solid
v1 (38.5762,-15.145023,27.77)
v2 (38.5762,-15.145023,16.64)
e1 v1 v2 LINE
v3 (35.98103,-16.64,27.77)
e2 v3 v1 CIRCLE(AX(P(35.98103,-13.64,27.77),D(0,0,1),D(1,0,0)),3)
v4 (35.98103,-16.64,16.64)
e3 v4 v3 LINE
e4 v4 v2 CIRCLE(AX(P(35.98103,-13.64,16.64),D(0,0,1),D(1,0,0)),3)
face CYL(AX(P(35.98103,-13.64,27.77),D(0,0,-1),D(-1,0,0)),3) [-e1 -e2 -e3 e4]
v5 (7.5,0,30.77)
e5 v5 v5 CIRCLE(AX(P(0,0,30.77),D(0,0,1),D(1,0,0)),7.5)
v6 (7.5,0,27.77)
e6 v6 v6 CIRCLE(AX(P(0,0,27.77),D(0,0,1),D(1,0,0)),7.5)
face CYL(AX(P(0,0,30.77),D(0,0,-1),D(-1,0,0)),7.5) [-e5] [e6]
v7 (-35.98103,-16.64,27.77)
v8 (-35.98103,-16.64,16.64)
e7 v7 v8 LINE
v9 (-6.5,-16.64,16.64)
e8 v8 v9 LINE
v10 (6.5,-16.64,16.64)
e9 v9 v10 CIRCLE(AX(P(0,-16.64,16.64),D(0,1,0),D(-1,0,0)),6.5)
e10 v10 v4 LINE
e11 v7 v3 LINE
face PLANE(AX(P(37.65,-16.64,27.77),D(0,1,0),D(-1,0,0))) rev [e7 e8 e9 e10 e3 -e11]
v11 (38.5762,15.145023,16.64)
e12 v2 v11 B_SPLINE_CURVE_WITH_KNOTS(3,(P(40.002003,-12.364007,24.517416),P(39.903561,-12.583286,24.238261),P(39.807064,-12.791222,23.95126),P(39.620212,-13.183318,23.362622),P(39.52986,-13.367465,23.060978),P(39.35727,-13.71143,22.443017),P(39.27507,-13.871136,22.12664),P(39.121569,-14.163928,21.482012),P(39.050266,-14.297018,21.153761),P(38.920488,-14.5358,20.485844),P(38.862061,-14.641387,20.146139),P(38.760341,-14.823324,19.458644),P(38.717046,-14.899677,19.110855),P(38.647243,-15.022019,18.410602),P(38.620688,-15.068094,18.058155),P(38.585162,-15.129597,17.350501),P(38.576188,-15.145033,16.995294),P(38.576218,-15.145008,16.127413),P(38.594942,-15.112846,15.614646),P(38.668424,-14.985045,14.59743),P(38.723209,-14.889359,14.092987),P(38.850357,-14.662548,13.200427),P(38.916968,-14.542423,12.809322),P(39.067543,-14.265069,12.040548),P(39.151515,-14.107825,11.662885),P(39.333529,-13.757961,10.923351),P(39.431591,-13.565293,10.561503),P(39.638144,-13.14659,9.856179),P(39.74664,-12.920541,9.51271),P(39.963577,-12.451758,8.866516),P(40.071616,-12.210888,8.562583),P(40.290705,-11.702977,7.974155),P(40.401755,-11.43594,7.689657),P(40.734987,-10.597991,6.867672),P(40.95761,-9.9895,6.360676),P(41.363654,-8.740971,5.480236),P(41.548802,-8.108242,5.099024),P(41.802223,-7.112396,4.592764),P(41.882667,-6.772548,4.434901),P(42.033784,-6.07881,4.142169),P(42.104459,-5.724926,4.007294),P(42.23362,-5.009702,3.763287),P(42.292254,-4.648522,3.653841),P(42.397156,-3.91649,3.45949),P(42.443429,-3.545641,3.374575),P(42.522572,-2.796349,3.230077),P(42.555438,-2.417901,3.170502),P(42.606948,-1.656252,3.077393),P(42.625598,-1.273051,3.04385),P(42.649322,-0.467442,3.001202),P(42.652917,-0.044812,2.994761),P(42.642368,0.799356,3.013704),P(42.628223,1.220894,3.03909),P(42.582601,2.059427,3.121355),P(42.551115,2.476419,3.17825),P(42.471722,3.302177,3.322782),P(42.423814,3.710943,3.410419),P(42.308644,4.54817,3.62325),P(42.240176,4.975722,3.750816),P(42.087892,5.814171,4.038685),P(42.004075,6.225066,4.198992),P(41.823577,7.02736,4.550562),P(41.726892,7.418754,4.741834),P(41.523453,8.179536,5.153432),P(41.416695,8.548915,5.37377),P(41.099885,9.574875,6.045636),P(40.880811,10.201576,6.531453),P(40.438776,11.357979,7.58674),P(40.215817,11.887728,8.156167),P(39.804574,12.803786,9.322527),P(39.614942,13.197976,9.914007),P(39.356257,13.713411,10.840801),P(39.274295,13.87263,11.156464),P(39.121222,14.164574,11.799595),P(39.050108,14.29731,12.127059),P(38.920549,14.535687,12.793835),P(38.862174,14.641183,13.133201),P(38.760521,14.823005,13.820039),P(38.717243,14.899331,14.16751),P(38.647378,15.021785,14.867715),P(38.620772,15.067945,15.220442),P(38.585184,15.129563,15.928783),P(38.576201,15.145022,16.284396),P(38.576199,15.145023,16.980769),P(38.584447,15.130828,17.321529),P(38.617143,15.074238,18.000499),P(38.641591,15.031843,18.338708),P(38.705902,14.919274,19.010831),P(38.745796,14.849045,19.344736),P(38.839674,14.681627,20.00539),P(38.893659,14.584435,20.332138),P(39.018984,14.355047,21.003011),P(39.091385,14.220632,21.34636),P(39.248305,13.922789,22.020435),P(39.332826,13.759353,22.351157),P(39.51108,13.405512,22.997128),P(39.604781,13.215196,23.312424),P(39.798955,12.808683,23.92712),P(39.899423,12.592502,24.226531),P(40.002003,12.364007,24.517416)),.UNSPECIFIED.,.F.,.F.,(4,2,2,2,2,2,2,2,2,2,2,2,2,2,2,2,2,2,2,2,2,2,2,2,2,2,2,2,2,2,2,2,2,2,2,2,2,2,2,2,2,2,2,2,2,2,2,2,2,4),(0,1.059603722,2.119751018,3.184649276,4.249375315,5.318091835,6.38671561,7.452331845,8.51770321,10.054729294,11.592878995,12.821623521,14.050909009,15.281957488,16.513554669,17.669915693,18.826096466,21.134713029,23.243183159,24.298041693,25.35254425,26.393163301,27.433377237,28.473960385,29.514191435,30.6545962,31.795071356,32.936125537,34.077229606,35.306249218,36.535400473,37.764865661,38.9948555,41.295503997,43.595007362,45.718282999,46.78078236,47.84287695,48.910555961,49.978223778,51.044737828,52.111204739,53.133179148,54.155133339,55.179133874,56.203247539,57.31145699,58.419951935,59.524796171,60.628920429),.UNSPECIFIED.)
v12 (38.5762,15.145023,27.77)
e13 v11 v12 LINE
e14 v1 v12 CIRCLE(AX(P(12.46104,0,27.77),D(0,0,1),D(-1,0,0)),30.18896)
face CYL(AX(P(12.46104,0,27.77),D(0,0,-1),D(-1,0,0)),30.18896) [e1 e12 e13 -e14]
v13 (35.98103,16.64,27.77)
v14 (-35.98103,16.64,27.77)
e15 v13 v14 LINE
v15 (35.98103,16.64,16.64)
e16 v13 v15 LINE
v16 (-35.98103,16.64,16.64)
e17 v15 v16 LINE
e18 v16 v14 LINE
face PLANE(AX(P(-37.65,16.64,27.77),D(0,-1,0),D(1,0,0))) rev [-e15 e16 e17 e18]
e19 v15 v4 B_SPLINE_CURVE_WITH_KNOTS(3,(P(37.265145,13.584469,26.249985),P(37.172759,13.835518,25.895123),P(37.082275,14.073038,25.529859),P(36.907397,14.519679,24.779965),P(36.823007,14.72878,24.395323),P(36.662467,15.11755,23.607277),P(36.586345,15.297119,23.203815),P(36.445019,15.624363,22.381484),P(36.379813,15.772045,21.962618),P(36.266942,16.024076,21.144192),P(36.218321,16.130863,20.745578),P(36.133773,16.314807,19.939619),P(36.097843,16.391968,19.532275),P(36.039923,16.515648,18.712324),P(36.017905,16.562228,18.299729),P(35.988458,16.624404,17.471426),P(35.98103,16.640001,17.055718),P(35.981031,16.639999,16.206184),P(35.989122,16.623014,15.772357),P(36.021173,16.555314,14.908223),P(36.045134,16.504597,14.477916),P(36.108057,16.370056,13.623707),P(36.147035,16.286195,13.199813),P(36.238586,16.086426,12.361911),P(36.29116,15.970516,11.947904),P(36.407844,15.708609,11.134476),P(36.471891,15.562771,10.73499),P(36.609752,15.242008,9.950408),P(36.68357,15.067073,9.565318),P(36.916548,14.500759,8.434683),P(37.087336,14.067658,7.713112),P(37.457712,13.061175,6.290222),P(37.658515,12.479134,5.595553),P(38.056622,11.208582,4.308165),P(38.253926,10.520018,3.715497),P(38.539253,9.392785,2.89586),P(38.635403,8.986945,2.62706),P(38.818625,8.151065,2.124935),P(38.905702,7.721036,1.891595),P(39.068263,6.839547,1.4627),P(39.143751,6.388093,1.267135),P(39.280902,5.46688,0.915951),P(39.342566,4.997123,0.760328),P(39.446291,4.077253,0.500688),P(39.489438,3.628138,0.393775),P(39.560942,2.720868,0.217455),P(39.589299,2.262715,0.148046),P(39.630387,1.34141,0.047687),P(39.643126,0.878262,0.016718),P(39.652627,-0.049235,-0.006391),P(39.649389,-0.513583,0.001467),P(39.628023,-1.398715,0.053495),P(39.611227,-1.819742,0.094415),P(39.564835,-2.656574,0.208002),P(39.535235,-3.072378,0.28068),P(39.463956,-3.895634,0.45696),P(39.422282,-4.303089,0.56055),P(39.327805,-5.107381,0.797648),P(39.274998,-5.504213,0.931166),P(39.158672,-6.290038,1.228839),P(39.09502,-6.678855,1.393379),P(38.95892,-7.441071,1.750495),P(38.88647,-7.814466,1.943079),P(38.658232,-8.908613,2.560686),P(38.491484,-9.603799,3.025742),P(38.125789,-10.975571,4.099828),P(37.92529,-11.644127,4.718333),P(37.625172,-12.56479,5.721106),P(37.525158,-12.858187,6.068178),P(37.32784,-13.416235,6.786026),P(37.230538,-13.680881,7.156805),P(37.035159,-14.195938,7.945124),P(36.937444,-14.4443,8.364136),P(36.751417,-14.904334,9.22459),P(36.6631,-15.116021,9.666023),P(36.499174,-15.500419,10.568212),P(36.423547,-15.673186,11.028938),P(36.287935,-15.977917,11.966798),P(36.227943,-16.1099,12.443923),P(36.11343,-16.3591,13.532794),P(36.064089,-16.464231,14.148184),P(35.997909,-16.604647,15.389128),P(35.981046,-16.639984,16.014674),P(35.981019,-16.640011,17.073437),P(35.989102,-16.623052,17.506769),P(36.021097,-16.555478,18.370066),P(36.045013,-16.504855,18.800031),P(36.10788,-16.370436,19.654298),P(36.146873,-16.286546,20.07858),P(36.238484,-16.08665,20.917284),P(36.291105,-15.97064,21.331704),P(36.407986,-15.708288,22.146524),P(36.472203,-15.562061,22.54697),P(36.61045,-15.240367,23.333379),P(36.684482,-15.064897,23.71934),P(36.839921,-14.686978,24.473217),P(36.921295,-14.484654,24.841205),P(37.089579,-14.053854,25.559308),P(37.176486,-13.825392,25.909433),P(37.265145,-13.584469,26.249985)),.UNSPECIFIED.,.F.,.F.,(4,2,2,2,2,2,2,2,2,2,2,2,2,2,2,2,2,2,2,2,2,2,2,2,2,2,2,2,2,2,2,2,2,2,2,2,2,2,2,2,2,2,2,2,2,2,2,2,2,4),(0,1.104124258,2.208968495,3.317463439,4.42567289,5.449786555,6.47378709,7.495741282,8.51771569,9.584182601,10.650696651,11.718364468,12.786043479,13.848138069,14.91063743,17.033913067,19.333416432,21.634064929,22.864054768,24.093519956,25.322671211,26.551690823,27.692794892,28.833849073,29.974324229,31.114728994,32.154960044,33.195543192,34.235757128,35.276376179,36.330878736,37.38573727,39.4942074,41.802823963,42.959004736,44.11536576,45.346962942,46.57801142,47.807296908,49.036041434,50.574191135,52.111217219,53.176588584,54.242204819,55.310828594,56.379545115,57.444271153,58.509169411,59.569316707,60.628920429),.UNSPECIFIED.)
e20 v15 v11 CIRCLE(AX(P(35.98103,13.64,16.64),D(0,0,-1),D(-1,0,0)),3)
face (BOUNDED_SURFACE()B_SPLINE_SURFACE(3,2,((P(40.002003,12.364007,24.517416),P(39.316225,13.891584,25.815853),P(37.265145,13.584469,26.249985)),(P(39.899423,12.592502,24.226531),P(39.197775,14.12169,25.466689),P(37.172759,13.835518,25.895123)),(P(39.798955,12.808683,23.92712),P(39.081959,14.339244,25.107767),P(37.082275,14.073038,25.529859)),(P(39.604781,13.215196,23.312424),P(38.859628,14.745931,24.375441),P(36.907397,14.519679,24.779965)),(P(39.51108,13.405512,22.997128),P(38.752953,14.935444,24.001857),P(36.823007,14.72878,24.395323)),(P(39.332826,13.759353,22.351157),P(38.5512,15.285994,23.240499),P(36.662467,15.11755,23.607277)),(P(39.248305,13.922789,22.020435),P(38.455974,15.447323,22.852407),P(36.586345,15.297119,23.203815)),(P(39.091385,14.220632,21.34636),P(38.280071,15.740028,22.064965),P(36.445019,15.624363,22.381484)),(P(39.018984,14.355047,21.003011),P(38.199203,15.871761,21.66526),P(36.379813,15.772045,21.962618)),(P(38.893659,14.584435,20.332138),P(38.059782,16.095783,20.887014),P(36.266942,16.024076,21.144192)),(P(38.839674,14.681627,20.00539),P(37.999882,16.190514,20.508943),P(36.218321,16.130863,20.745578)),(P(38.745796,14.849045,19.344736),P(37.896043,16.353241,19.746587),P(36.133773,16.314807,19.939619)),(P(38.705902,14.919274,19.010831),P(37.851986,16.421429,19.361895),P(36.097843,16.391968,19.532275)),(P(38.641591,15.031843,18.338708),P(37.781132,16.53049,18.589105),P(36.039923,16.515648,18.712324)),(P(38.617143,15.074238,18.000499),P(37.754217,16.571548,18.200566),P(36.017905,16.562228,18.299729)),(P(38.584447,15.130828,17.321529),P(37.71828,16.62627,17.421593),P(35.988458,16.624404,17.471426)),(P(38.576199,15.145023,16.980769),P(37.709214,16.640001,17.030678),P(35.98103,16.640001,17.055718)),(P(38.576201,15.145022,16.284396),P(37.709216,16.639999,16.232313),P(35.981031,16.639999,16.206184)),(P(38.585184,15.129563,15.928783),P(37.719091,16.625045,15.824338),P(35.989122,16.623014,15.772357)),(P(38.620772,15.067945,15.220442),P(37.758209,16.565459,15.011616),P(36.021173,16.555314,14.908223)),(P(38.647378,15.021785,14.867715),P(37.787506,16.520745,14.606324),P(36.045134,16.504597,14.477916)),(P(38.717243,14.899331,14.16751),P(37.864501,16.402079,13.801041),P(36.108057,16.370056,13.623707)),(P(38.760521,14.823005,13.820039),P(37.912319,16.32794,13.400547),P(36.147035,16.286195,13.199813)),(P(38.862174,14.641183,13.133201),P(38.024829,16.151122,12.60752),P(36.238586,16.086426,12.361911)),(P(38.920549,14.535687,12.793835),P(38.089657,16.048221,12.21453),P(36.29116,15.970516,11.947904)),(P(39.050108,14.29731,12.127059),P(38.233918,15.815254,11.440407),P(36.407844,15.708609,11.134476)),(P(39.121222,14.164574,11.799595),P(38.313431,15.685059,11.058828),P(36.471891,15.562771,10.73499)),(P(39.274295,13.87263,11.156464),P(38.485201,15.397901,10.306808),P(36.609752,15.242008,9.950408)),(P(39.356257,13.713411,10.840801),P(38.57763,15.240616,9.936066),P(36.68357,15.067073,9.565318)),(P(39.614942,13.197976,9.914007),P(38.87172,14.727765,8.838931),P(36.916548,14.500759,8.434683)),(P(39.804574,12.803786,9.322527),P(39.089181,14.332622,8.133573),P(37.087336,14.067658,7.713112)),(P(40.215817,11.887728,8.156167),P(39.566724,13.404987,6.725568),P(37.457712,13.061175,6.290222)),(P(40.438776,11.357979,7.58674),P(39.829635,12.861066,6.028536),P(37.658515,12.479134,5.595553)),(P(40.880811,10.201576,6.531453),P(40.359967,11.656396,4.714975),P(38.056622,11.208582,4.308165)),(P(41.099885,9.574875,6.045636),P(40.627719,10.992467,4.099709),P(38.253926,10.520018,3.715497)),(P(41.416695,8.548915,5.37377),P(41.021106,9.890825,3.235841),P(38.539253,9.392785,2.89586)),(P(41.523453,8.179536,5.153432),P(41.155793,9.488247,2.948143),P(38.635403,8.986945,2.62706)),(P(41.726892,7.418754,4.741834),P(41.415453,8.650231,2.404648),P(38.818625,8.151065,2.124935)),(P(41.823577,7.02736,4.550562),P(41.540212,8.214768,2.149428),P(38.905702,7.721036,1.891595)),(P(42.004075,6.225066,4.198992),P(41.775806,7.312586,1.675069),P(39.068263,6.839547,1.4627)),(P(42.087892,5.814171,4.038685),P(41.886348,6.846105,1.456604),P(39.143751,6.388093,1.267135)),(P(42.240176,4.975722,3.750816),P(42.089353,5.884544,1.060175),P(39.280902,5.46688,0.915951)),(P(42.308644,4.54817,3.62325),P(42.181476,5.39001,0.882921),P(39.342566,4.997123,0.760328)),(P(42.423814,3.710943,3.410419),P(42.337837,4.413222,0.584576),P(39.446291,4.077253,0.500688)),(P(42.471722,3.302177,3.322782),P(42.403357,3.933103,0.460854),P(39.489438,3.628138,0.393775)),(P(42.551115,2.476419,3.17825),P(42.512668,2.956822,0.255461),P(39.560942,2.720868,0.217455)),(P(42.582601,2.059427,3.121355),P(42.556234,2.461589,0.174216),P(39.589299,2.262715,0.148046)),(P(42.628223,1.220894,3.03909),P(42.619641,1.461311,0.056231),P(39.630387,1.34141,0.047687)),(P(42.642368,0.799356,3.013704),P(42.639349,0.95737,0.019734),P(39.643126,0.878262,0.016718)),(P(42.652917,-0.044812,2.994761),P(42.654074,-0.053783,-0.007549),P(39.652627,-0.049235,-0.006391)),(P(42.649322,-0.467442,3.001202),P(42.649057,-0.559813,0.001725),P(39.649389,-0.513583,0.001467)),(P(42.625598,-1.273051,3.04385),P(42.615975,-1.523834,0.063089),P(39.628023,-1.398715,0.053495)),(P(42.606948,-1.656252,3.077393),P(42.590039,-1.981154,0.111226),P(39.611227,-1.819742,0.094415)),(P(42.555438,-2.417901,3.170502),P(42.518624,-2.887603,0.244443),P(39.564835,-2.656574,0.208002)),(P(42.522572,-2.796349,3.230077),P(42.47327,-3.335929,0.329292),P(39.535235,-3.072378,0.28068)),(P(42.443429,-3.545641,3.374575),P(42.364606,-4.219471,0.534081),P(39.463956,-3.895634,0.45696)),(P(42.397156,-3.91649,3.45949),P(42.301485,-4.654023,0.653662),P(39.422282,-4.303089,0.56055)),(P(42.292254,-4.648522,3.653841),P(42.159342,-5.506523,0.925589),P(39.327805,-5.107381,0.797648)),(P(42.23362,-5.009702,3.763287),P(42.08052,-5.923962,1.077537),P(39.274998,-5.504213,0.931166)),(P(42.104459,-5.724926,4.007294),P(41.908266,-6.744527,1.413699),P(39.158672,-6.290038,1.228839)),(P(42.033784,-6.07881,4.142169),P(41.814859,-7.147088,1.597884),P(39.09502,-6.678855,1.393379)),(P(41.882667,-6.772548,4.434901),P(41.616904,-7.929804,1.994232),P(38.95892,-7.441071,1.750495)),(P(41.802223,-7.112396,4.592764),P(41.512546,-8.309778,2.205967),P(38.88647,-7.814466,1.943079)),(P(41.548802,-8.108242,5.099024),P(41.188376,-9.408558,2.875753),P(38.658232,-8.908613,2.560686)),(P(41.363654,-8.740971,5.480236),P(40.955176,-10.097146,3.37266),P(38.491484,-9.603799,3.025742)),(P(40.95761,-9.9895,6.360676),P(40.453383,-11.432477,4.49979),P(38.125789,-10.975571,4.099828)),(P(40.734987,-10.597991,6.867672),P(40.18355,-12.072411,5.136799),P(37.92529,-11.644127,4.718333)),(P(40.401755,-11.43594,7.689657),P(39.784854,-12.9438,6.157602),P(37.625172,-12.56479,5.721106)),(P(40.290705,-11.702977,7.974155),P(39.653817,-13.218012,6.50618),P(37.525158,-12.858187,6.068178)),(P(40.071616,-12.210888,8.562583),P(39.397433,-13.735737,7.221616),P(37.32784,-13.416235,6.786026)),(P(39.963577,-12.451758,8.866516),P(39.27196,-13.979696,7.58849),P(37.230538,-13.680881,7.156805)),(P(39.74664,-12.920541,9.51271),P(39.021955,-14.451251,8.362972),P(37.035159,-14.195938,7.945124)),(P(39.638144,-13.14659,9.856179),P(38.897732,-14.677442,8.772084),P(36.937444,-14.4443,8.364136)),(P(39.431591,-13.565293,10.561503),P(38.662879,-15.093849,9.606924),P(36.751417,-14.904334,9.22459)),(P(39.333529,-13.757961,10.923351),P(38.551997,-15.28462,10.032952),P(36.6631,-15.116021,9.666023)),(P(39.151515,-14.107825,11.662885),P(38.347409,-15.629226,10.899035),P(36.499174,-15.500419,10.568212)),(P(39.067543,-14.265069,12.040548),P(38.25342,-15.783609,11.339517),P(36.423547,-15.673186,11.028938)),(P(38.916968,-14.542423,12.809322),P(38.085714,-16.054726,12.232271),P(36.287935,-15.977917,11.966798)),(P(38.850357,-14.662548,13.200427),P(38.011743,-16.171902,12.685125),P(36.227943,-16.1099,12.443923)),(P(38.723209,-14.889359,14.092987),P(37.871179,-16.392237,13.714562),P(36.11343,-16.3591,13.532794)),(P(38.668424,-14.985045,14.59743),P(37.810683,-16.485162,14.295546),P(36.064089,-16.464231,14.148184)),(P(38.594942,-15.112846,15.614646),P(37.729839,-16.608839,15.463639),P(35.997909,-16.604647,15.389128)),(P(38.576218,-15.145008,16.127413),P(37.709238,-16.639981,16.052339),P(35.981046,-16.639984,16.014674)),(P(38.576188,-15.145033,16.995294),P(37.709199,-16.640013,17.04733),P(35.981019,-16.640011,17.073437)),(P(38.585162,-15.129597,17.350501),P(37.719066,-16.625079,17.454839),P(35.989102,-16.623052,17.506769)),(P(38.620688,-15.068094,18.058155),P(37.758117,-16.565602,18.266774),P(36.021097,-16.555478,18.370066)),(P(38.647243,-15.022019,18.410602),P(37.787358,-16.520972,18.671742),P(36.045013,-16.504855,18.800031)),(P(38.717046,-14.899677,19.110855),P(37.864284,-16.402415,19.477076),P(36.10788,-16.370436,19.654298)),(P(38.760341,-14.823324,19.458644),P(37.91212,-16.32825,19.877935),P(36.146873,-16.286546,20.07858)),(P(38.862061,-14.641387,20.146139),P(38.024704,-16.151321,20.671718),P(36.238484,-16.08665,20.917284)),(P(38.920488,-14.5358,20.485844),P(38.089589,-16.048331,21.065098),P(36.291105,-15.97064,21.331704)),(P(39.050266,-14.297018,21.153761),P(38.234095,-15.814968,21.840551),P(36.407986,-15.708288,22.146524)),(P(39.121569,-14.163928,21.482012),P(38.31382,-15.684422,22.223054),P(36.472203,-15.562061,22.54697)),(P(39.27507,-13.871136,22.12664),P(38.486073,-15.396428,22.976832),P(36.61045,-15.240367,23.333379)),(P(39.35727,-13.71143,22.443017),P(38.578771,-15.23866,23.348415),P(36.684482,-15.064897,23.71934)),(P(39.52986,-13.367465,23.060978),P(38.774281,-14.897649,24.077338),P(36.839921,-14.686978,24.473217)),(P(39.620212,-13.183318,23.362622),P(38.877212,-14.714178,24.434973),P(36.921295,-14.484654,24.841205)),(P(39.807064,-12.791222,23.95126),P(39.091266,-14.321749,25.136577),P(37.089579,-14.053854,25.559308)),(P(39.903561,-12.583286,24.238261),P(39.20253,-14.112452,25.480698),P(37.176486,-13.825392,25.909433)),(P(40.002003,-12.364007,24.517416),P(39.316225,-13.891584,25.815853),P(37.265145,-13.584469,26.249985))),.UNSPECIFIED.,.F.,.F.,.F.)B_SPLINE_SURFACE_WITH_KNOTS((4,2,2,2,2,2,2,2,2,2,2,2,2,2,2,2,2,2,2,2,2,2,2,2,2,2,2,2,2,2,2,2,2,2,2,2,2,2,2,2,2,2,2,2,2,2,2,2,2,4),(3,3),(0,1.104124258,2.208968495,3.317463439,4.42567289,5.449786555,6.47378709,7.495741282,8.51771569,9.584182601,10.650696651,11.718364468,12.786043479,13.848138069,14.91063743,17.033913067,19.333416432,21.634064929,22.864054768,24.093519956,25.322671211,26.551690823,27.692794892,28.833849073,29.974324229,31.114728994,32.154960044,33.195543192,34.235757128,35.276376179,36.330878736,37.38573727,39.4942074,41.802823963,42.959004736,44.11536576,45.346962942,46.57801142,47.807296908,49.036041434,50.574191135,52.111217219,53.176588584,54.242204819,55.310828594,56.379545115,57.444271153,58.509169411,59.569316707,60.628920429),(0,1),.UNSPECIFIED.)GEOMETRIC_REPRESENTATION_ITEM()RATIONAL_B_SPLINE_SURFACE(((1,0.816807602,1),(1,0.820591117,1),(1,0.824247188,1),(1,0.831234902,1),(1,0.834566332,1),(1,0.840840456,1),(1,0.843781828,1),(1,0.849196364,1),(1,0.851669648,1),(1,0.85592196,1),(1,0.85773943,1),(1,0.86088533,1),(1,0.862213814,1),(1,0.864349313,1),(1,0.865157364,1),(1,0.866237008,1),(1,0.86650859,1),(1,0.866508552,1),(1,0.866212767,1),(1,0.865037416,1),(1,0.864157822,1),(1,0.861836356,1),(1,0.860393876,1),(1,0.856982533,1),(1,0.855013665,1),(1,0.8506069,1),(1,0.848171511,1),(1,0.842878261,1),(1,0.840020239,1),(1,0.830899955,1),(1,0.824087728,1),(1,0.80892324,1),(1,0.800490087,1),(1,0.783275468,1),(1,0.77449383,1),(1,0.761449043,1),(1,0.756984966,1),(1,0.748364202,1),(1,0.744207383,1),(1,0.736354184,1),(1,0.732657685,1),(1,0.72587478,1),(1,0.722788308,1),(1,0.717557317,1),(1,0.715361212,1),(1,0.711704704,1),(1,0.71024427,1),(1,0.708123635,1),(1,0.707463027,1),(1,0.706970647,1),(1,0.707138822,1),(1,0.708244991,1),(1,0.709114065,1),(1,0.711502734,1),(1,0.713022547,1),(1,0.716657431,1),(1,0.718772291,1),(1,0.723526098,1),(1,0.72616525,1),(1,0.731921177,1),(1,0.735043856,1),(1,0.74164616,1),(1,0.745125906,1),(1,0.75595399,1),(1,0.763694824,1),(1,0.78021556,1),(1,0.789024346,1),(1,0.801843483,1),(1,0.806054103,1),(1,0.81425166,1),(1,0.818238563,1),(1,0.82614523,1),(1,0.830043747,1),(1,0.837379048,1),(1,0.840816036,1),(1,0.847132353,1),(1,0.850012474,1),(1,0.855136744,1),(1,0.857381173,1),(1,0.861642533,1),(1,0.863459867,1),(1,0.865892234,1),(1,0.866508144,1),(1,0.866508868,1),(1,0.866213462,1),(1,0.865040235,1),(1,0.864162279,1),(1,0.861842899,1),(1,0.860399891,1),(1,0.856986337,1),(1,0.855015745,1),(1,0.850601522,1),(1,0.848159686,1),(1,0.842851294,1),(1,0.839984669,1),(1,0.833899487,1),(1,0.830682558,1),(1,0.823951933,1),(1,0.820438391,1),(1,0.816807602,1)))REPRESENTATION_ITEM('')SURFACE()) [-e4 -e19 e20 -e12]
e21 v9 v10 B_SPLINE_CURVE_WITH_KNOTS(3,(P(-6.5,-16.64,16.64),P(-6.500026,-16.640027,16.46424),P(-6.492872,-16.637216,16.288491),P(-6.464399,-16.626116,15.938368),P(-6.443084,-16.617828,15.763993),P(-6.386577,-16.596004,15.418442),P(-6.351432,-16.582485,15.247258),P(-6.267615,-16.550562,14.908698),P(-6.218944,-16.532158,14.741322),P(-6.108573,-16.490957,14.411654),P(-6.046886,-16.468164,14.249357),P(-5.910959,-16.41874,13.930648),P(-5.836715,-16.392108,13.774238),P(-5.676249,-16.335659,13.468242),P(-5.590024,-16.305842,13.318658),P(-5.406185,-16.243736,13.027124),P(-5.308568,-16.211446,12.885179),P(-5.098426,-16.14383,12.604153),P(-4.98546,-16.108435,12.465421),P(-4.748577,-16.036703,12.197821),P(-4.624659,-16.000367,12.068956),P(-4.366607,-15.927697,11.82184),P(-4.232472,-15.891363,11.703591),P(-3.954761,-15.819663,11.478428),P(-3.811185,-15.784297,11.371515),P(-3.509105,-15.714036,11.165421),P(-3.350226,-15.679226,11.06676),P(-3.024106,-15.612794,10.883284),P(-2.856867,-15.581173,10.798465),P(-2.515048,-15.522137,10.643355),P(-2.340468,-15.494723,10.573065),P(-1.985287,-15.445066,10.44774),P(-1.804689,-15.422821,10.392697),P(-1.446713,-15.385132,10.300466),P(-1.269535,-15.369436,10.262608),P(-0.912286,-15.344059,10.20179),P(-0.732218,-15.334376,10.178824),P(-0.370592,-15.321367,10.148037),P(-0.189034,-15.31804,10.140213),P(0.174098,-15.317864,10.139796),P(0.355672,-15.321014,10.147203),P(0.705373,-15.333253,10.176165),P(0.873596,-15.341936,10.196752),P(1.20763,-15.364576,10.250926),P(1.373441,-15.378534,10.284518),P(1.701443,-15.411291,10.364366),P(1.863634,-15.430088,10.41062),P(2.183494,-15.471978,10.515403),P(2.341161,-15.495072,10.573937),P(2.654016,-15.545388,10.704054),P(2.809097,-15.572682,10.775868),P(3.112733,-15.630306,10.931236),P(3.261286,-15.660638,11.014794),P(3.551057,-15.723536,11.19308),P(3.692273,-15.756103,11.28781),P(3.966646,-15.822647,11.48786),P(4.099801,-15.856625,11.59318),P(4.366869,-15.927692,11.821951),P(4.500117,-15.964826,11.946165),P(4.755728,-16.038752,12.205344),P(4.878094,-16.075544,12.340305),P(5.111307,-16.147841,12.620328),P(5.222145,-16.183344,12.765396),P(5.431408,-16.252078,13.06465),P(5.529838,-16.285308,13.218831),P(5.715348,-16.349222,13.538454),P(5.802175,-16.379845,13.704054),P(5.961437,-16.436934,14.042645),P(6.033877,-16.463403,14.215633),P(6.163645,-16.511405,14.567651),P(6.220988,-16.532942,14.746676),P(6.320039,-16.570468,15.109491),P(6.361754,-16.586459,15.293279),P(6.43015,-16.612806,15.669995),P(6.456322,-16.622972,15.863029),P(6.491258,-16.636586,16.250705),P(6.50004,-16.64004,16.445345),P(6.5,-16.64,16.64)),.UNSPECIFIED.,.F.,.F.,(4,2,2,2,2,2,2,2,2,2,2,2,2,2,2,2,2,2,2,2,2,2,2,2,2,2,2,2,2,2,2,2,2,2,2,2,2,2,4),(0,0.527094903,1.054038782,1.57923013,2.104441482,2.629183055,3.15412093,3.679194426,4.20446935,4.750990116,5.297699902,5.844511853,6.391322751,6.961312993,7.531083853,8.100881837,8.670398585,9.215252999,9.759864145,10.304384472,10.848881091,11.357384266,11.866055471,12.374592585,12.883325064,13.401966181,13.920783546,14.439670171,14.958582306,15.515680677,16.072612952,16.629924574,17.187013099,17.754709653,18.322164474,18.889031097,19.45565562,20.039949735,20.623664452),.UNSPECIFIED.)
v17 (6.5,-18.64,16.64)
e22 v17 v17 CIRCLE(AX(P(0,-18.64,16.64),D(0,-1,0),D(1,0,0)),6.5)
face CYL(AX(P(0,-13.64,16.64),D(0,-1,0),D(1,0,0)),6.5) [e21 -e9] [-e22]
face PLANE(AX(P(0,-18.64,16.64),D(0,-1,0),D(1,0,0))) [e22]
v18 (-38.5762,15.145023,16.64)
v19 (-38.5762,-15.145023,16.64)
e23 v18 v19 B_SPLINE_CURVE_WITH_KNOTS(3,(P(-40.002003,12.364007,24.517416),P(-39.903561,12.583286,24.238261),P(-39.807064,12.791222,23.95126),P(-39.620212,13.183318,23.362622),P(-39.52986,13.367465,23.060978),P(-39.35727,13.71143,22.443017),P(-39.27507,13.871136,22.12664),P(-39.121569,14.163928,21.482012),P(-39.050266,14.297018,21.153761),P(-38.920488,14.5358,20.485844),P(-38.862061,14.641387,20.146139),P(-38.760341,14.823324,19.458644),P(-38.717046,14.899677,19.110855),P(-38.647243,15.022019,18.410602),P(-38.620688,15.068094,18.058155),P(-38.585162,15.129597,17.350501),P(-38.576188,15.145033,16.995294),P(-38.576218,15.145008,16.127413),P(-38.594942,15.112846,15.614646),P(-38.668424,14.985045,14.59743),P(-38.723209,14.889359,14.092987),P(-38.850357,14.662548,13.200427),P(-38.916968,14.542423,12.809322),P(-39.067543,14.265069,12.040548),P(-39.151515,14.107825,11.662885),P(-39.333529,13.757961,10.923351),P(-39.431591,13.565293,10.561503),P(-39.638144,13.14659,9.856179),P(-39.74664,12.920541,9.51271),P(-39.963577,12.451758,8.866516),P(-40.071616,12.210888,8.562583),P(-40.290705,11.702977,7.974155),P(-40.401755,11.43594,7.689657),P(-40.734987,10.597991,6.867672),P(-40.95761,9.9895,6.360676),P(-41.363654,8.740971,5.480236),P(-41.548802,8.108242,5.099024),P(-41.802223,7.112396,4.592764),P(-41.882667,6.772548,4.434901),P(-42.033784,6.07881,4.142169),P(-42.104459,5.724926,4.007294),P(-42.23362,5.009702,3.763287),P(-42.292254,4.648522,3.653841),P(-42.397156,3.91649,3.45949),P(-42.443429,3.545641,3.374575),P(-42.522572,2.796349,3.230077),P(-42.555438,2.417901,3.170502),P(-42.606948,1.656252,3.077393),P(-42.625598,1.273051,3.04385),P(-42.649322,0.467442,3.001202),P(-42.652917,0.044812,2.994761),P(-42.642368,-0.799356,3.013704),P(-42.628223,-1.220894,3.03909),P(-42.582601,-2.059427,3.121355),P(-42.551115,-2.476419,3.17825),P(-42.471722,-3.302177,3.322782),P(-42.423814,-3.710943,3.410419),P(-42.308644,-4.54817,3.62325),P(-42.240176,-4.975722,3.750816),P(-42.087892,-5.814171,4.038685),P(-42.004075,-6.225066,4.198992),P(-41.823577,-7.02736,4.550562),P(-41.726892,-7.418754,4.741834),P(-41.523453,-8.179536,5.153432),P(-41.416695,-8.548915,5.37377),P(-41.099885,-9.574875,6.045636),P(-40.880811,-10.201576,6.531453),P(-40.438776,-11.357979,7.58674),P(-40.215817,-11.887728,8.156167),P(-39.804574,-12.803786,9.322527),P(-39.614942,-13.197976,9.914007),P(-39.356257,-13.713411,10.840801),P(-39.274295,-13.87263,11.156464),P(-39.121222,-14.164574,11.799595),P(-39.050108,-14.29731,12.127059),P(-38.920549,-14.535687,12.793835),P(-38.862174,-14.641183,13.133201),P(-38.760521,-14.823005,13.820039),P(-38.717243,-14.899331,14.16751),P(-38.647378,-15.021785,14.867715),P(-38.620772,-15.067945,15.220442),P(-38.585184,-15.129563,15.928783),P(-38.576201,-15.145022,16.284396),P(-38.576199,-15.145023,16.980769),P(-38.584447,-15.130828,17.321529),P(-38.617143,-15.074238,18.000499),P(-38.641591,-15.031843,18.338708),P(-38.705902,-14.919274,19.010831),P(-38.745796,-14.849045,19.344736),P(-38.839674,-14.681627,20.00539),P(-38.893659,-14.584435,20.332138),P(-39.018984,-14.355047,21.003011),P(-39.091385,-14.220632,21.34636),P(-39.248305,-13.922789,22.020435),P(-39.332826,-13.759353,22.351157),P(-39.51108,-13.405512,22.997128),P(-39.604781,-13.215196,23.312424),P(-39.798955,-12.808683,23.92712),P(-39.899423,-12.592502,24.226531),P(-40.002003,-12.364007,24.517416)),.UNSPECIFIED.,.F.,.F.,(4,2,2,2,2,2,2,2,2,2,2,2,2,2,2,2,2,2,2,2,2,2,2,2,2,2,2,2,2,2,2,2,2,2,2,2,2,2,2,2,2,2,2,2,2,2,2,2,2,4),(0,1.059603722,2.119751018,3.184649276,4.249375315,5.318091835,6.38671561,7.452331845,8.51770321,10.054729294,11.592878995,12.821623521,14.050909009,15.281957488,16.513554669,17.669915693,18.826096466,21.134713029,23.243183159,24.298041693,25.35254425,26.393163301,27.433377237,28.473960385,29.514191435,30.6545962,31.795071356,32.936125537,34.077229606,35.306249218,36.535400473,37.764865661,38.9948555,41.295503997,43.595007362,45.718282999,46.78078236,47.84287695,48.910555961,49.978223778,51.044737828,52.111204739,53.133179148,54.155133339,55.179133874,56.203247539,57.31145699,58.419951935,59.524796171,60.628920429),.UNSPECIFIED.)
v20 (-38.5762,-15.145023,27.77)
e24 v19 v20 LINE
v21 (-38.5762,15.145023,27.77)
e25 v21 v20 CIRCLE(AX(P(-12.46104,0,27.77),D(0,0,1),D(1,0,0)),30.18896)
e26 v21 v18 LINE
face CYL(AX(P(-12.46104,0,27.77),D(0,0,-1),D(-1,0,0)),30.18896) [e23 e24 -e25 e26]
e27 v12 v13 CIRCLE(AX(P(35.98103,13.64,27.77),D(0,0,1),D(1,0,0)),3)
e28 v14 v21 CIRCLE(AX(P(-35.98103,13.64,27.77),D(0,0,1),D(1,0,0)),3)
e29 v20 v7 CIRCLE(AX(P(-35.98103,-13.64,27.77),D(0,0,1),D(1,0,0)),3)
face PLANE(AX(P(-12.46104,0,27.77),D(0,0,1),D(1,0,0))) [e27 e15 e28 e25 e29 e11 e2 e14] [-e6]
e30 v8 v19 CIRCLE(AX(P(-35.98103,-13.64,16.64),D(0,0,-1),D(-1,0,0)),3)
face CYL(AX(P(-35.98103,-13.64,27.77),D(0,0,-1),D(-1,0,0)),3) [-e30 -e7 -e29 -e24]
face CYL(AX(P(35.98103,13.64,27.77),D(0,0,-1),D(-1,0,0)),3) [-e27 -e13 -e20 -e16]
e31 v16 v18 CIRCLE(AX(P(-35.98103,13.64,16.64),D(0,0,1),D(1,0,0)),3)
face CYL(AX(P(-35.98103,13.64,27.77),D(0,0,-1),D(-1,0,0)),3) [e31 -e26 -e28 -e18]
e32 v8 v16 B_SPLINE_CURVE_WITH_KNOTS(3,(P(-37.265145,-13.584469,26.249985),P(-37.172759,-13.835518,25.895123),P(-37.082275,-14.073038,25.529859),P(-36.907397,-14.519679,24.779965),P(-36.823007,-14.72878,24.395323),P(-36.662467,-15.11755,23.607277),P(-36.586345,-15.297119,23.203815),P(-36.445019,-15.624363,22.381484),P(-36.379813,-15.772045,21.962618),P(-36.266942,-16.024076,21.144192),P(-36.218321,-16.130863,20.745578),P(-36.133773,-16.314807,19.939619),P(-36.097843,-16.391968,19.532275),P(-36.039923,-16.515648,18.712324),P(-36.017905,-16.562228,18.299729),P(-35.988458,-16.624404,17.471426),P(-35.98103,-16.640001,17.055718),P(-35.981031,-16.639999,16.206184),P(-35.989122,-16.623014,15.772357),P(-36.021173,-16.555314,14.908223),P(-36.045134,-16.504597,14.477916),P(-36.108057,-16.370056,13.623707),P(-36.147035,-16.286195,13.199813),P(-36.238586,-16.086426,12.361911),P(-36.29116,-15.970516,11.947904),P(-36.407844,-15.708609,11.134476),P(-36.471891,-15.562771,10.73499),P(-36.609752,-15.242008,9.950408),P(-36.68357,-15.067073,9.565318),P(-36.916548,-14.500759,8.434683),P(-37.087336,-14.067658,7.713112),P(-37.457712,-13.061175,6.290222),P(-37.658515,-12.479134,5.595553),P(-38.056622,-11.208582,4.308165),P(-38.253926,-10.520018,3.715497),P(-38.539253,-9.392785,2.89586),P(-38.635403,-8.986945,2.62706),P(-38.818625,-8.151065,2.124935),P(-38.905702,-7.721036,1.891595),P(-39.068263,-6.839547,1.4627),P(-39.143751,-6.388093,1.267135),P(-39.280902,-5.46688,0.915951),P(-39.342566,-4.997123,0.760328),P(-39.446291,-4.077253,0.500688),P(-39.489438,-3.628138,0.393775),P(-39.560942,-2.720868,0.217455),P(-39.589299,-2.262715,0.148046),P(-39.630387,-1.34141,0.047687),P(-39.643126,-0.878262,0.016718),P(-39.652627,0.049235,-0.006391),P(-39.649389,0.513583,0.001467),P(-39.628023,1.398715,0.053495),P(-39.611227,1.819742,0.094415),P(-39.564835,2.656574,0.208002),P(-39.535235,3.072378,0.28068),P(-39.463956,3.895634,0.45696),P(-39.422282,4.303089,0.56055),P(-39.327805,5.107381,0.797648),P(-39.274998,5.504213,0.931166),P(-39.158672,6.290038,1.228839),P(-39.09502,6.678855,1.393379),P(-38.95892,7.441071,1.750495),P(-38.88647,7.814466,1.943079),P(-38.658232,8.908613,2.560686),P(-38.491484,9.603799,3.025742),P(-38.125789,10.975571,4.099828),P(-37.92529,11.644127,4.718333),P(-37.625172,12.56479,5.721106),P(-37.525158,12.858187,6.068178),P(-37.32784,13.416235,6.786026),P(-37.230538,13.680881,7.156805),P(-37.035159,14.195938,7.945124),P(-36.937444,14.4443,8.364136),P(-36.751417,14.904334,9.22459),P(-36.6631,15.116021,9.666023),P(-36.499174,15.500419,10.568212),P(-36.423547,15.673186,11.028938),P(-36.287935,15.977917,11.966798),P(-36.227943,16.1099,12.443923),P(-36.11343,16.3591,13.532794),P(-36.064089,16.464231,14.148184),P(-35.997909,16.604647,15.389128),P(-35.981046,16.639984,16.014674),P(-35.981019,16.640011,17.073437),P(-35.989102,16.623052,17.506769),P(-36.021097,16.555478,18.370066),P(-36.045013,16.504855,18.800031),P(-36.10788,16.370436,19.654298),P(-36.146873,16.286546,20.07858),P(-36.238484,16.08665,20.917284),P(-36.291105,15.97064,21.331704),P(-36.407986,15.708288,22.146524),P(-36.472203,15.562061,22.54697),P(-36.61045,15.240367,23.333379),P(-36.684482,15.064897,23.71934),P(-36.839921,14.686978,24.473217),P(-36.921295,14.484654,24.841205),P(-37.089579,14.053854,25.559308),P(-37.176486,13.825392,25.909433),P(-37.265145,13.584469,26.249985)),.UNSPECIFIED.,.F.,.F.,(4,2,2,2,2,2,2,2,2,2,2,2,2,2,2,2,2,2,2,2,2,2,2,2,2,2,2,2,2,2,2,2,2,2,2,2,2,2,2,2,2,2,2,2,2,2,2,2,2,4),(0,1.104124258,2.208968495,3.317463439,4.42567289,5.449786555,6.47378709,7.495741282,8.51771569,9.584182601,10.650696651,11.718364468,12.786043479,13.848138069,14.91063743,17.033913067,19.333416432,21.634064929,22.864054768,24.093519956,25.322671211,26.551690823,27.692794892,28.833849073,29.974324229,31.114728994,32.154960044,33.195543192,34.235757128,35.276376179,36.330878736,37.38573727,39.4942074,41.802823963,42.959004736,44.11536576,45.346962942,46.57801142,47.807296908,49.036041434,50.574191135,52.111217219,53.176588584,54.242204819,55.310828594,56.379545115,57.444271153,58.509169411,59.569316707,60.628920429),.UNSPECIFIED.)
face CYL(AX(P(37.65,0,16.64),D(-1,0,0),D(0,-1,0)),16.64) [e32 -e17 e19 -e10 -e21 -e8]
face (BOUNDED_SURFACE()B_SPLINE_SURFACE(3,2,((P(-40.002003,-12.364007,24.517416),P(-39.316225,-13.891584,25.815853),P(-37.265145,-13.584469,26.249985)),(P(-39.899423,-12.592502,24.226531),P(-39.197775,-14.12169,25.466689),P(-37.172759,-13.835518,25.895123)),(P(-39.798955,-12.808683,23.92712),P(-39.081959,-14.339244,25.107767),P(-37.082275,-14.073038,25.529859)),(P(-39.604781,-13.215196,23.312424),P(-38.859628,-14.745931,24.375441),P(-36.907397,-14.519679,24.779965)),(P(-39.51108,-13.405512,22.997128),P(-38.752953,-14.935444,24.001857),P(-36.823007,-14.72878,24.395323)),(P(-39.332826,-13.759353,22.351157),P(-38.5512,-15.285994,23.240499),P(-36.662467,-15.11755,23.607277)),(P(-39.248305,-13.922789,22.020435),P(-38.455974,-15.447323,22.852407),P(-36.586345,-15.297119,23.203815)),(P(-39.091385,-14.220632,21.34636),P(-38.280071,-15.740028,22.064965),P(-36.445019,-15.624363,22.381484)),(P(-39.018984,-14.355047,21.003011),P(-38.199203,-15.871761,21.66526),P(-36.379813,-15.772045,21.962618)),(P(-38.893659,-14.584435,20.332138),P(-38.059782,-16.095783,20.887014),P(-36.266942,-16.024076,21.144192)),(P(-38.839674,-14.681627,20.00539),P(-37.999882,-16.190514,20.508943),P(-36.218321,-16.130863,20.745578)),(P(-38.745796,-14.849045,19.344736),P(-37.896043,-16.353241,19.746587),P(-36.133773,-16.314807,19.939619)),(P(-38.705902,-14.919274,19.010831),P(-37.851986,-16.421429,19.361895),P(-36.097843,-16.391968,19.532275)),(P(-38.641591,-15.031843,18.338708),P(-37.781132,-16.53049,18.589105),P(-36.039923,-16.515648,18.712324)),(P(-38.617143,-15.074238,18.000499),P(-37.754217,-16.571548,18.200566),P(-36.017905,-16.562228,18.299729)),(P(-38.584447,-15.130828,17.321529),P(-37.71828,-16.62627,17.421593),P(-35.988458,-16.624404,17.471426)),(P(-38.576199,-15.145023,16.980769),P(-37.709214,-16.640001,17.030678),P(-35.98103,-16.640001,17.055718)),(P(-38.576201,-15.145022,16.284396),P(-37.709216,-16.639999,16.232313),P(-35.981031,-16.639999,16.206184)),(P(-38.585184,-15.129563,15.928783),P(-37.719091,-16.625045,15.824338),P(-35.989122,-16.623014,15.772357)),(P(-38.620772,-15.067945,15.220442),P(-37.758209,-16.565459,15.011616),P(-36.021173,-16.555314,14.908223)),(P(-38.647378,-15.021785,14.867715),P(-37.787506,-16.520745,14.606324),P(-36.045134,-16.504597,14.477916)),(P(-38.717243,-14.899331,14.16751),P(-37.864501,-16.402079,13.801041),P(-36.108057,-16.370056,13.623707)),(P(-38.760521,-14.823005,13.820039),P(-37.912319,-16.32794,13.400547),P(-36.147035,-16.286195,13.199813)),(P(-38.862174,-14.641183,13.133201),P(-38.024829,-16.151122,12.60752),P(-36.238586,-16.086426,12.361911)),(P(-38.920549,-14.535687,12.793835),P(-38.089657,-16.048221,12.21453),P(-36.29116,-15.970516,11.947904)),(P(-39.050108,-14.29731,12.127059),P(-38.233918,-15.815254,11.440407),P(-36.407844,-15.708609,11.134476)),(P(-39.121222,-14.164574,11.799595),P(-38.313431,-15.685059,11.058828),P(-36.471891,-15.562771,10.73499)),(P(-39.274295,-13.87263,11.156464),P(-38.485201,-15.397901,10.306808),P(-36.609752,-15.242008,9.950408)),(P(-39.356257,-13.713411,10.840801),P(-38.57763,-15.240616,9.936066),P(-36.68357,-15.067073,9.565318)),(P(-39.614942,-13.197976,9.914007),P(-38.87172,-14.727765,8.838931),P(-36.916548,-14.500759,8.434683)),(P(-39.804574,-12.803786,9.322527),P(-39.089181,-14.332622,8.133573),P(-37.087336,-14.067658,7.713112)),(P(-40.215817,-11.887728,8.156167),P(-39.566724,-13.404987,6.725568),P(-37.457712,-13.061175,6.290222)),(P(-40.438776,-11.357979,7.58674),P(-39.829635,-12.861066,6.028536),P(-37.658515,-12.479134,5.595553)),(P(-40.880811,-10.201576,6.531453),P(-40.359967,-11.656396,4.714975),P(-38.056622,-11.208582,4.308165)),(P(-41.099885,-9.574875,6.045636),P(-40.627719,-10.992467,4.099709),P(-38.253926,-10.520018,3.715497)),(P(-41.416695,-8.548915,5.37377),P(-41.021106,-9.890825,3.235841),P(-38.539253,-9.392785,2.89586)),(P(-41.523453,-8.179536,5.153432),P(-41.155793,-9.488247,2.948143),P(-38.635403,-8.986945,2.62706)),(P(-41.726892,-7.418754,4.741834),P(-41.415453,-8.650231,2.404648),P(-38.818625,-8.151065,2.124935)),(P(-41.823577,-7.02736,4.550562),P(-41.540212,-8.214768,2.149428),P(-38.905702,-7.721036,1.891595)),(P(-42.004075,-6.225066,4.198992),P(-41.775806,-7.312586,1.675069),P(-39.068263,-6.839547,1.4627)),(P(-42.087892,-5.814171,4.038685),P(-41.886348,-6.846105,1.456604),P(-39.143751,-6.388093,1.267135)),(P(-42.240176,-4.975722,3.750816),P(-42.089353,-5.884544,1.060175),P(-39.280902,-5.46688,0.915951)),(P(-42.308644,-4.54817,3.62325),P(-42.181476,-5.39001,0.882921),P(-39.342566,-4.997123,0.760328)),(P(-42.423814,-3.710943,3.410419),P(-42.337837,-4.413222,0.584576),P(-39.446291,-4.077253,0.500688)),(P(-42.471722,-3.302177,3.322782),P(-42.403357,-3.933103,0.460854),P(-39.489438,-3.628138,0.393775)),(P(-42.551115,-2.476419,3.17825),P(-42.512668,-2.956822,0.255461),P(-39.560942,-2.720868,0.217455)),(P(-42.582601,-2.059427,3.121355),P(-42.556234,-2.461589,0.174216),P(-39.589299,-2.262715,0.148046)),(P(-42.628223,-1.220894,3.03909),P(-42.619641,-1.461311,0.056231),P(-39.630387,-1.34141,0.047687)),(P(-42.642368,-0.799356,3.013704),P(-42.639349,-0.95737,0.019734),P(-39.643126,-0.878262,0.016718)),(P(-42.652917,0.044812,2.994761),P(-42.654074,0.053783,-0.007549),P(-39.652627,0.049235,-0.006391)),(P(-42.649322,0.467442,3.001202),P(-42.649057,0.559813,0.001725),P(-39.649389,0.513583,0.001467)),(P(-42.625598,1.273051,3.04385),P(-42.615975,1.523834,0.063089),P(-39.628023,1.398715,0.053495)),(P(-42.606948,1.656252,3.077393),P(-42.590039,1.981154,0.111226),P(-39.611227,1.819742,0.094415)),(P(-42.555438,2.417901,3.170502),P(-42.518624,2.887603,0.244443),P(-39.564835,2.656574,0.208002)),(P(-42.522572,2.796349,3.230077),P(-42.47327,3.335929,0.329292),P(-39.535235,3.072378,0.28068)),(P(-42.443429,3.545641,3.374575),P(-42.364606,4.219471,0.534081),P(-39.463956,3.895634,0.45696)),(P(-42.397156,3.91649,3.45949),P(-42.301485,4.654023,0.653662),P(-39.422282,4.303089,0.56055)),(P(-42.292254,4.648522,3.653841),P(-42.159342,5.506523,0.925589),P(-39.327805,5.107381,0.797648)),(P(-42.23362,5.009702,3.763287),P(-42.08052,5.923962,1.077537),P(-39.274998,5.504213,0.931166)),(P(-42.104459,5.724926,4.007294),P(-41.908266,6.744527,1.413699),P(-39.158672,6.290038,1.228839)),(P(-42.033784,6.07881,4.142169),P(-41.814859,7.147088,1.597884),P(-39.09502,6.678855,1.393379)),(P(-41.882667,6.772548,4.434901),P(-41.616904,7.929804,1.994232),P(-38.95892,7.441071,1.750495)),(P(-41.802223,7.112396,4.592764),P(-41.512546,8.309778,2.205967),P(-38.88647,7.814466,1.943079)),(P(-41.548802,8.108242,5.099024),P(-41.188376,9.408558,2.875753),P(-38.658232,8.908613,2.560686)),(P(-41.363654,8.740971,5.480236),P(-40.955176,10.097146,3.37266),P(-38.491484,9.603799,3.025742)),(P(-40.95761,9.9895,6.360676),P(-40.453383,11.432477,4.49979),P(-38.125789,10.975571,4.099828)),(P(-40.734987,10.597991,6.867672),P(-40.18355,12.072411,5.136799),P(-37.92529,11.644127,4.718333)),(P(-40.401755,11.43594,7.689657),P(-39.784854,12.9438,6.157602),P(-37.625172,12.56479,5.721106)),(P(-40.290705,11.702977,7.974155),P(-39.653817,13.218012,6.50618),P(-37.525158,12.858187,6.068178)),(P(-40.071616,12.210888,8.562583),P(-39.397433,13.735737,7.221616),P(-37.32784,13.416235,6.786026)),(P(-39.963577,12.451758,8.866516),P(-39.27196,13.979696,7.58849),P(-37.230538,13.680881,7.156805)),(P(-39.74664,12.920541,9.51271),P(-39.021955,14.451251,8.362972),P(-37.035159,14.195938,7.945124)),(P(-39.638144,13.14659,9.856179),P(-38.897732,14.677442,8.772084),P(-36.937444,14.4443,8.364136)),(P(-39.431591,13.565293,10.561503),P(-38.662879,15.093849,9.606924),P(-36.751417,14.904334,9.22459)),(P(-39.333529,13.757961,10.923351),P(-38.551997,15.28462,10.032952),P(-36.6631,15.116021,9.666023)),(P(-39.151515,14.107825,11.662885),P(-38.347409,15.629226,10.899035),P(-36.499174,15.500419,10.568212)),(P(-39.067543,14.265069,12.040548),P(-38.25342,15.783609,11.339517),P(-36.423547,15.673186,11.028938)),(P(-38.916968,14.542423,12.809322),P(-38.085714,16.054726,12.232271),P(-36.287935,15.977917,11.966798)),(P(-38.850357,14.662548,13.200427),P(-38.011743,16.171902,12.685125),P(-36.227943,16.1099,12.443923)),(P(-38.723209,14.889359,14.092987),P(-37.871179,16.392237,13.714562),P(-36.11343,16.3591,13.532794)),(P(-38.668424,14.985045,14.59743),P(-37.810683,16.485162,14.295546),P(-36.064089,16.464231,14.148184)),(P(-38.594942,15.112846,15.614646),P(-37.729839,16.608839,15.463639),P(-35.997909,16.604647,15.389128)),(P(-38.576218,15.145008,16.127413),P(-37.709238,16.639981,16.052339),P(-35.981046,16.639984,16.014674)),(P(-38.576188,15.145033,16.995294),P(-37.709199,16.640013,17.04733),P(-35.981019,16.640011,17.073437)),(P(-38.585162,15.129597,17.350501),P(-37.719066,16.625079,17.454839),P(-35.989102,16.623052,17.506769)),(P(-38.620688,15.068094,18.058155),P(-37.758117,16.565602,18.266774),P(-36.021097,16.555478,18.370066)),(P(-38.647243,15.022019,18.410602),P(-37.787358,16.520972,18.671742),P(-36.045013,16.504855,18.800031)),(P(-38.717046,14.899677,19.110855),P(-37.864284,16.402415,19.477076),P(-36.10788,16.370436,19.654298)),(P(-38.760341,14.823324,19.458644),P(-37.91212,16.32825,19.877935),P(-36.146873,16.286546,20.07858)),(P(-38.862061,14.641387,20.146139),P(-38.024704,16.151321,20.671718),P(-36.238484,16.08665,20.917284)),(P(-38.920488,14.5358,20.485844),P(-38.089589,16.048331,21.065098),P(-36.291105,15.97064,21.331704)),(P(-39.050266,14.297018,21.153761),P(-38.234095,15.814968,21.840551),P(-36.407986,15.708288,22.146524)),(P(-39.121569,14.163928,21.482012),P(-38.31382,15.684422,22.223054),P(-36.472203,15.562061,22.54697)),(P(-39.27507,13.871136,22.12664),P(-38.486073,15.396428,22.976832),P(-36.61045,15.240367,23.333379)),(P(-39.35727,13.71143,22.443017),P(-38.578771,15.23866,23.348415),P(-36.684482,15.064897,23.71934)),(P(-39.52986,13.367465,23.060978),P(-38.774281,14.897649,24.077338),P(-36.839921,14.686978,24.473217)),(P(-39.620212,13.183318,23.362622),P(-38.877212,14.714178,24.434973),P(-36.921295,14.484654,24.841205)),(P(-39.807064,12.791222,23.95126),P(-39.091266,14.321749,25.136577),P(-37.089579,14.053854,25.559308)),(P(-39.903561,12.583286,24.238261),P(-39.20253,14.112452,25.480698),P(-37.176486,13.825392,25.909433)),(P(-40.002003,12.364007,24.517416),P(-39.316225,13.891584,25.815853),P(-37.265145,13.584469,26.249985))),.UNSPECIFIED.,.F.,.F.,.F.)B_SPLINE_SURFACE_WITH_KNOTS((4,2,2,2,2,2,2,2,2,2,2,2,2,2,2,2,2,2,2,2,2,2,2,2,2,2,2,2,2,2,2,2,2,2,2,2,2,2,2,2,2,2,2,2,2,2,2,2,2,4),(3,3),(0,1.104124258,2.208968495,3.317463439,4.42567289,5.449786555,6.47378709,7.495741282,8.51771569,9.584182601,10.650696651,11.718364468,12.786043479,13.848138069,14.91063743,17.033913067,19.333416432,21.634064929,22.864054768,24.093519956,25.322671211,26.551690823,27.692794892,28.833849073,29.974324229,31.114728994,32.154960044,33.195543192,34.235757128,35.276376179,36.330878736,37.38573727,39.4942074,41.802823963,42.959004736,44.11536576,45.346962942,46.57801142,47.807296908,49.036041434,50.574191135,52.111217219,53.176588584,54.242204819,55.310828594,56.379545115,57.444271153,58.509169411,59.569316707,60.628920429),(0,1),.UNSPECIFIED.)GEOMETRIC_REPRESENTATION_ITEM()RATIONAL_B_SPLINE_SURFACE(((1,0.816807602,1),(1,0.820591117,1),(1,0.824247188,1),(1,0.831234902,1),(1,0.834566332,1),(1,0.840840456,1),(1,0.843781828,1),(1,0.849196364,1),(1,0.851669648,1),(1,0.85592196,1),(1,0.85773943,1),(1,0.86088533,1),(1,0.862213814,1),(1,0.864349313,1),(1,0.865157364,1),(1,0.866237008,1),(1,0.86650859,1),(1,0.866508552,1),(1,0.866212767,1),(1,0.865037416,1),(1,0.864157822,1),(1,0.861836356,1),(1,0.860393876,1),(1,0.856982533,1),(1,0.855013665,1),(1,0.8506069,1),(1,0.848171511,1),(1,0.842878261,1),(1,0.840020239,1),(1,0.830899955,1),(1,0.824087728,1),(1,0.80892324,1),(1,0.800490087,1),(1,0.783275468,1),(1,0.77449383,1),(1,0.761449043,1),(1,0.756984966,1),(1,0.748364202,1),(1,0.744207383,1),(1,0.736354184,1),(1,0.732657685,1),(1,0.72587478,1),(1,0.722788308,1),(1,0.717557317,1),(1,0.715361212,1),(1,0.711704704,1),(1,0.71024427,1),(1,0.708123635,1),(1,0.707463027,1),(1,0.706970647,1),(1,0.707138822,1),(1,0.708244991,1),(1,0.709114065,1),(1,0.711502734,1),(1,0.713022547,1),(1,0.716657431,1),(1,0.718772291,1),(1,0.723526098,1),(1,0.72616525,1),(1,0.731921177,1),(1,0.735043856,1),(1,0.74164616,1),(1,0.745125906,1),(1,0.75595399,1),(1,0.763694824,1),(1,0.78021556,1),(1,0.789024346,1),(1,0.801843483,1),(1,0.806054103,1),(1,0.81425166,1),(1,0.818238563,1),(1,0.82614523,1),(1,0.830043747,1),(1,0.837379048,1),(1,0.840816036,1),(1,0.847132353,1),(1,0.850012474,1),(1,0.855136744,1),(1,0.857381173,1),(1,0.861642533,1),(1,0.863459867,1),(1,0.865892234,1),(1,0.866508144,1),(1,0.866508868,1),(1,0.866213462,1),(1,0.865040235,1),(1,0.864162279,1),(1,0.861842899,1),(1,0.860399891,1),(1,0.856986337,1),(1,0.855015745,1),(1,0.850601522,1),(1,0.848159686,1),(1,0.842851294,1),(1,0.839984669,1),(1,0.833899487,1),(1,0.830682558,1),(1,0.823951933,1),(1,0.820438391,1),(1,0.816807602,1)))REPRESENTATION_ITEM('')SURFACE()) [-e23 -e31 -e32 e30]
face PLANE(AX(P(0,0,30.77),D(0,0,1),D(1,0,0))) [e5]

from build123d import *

# Parameters (mm, degrees)
BOSS_EXTRUDE1_DEPTH      = 27.77
FILLET1_START            = -44
FILLET1_DEPTH            = 88
FILLET2_R                = 3
SKETCH3_R                = 7.5
BOSS_EXTRUDE2_DEPTH      = 3
BOSS_EXTRUDE3_DEPTH      = 2
BOSS_EXTRUDE3_DEPTH_BACK = 3
SKETCH4_R                = 6.5


with BuildPart() as part:
    # Sketch2 → Boss-Extrude1 (new body)
    with BuildSketch(Plane.XY):
        with BuildLine():
            Line((-37.65, 16.64), (37.65, 16.64))
            ThreePointArc((37.65, 16.64), (42.65, 0), (37.65, -16.64))
            Line((37.65, -16.64), (-37.65, -16.64))
            ThreePointArc((-37.65, -16.64), (-42.65, 0), (-37.65, 16.64))
        make_face()
    extrude(amount=BOSS_EXTRUDE1_DEPTH)

    # Fillet1: read off the stored shape, not the designer's step
    # Fillet1 outline → Fillet1 (cut)
    with BuildSketch(Plane.YZ.offset(FILLET1_START)):
        with BuildLine():
            Line((16.64, 0), (16.64, 16.64))
            ThreePointArc((16.64, 16.64), (11.766256851, 4.873743173), (3.4e-08, 0))
            Line((3.4e-08, 0), (16.64, 0))
        make_face()
        with BuildLine():
            Line((-16.64, 0), (3.4e-08, 0))
            ThreePointArc((3.4e-08, 0), (-11.766256827, 4.873743149), (-16.64, 16.64))
            Line((-16.64, 16.64), (-16.64, 0))
        make_face()
    extrude(amount=FILLET1_DEPTH, mode=Mode.SUBTRACT)

    # Fillet2
    fillet2_edges = [part.edges().sort_by_distance(p)[0] for p in [
        (40.256336976, -11.781119236, 4.888624385),
        (-40.256337033, -11.781119103, 4.888624252),
        (-37.65, 16.64, 22.205),
        (37.65, 16.64, 22.205),
        (37.65, -16.64, 22.205),
        (-37.65, -16.64, 22.205),
    ]]
    fillet(fillet2_edges, radius=FILLET2_R)

    # Sketch3 → Boss-Extrude2 (add)
    with BuildSketch(Plane.XY.offset(27.77)):
        Circle(SKETCH3_R)
    extrude(amount=BOSS_EXTRUDE2_DEPTH)

    # Sketch4 → Boss-Extrude3 (add, two sides: drawn at the far end of the back side and taken through both)
    with BuildSketch(Plane.XZ.offset(16.64).offset(-BOSS_EXTRUDE3_DEPTH_BACK)):
        with Locations((0, 16.64)):
            Circle(SKETCH4_R)
    extrude(amount=BOSS_EXTRUDE3_DEPTH + BOSS_EXTRUDE3_DEPTH_BACK)


solid = part.part
